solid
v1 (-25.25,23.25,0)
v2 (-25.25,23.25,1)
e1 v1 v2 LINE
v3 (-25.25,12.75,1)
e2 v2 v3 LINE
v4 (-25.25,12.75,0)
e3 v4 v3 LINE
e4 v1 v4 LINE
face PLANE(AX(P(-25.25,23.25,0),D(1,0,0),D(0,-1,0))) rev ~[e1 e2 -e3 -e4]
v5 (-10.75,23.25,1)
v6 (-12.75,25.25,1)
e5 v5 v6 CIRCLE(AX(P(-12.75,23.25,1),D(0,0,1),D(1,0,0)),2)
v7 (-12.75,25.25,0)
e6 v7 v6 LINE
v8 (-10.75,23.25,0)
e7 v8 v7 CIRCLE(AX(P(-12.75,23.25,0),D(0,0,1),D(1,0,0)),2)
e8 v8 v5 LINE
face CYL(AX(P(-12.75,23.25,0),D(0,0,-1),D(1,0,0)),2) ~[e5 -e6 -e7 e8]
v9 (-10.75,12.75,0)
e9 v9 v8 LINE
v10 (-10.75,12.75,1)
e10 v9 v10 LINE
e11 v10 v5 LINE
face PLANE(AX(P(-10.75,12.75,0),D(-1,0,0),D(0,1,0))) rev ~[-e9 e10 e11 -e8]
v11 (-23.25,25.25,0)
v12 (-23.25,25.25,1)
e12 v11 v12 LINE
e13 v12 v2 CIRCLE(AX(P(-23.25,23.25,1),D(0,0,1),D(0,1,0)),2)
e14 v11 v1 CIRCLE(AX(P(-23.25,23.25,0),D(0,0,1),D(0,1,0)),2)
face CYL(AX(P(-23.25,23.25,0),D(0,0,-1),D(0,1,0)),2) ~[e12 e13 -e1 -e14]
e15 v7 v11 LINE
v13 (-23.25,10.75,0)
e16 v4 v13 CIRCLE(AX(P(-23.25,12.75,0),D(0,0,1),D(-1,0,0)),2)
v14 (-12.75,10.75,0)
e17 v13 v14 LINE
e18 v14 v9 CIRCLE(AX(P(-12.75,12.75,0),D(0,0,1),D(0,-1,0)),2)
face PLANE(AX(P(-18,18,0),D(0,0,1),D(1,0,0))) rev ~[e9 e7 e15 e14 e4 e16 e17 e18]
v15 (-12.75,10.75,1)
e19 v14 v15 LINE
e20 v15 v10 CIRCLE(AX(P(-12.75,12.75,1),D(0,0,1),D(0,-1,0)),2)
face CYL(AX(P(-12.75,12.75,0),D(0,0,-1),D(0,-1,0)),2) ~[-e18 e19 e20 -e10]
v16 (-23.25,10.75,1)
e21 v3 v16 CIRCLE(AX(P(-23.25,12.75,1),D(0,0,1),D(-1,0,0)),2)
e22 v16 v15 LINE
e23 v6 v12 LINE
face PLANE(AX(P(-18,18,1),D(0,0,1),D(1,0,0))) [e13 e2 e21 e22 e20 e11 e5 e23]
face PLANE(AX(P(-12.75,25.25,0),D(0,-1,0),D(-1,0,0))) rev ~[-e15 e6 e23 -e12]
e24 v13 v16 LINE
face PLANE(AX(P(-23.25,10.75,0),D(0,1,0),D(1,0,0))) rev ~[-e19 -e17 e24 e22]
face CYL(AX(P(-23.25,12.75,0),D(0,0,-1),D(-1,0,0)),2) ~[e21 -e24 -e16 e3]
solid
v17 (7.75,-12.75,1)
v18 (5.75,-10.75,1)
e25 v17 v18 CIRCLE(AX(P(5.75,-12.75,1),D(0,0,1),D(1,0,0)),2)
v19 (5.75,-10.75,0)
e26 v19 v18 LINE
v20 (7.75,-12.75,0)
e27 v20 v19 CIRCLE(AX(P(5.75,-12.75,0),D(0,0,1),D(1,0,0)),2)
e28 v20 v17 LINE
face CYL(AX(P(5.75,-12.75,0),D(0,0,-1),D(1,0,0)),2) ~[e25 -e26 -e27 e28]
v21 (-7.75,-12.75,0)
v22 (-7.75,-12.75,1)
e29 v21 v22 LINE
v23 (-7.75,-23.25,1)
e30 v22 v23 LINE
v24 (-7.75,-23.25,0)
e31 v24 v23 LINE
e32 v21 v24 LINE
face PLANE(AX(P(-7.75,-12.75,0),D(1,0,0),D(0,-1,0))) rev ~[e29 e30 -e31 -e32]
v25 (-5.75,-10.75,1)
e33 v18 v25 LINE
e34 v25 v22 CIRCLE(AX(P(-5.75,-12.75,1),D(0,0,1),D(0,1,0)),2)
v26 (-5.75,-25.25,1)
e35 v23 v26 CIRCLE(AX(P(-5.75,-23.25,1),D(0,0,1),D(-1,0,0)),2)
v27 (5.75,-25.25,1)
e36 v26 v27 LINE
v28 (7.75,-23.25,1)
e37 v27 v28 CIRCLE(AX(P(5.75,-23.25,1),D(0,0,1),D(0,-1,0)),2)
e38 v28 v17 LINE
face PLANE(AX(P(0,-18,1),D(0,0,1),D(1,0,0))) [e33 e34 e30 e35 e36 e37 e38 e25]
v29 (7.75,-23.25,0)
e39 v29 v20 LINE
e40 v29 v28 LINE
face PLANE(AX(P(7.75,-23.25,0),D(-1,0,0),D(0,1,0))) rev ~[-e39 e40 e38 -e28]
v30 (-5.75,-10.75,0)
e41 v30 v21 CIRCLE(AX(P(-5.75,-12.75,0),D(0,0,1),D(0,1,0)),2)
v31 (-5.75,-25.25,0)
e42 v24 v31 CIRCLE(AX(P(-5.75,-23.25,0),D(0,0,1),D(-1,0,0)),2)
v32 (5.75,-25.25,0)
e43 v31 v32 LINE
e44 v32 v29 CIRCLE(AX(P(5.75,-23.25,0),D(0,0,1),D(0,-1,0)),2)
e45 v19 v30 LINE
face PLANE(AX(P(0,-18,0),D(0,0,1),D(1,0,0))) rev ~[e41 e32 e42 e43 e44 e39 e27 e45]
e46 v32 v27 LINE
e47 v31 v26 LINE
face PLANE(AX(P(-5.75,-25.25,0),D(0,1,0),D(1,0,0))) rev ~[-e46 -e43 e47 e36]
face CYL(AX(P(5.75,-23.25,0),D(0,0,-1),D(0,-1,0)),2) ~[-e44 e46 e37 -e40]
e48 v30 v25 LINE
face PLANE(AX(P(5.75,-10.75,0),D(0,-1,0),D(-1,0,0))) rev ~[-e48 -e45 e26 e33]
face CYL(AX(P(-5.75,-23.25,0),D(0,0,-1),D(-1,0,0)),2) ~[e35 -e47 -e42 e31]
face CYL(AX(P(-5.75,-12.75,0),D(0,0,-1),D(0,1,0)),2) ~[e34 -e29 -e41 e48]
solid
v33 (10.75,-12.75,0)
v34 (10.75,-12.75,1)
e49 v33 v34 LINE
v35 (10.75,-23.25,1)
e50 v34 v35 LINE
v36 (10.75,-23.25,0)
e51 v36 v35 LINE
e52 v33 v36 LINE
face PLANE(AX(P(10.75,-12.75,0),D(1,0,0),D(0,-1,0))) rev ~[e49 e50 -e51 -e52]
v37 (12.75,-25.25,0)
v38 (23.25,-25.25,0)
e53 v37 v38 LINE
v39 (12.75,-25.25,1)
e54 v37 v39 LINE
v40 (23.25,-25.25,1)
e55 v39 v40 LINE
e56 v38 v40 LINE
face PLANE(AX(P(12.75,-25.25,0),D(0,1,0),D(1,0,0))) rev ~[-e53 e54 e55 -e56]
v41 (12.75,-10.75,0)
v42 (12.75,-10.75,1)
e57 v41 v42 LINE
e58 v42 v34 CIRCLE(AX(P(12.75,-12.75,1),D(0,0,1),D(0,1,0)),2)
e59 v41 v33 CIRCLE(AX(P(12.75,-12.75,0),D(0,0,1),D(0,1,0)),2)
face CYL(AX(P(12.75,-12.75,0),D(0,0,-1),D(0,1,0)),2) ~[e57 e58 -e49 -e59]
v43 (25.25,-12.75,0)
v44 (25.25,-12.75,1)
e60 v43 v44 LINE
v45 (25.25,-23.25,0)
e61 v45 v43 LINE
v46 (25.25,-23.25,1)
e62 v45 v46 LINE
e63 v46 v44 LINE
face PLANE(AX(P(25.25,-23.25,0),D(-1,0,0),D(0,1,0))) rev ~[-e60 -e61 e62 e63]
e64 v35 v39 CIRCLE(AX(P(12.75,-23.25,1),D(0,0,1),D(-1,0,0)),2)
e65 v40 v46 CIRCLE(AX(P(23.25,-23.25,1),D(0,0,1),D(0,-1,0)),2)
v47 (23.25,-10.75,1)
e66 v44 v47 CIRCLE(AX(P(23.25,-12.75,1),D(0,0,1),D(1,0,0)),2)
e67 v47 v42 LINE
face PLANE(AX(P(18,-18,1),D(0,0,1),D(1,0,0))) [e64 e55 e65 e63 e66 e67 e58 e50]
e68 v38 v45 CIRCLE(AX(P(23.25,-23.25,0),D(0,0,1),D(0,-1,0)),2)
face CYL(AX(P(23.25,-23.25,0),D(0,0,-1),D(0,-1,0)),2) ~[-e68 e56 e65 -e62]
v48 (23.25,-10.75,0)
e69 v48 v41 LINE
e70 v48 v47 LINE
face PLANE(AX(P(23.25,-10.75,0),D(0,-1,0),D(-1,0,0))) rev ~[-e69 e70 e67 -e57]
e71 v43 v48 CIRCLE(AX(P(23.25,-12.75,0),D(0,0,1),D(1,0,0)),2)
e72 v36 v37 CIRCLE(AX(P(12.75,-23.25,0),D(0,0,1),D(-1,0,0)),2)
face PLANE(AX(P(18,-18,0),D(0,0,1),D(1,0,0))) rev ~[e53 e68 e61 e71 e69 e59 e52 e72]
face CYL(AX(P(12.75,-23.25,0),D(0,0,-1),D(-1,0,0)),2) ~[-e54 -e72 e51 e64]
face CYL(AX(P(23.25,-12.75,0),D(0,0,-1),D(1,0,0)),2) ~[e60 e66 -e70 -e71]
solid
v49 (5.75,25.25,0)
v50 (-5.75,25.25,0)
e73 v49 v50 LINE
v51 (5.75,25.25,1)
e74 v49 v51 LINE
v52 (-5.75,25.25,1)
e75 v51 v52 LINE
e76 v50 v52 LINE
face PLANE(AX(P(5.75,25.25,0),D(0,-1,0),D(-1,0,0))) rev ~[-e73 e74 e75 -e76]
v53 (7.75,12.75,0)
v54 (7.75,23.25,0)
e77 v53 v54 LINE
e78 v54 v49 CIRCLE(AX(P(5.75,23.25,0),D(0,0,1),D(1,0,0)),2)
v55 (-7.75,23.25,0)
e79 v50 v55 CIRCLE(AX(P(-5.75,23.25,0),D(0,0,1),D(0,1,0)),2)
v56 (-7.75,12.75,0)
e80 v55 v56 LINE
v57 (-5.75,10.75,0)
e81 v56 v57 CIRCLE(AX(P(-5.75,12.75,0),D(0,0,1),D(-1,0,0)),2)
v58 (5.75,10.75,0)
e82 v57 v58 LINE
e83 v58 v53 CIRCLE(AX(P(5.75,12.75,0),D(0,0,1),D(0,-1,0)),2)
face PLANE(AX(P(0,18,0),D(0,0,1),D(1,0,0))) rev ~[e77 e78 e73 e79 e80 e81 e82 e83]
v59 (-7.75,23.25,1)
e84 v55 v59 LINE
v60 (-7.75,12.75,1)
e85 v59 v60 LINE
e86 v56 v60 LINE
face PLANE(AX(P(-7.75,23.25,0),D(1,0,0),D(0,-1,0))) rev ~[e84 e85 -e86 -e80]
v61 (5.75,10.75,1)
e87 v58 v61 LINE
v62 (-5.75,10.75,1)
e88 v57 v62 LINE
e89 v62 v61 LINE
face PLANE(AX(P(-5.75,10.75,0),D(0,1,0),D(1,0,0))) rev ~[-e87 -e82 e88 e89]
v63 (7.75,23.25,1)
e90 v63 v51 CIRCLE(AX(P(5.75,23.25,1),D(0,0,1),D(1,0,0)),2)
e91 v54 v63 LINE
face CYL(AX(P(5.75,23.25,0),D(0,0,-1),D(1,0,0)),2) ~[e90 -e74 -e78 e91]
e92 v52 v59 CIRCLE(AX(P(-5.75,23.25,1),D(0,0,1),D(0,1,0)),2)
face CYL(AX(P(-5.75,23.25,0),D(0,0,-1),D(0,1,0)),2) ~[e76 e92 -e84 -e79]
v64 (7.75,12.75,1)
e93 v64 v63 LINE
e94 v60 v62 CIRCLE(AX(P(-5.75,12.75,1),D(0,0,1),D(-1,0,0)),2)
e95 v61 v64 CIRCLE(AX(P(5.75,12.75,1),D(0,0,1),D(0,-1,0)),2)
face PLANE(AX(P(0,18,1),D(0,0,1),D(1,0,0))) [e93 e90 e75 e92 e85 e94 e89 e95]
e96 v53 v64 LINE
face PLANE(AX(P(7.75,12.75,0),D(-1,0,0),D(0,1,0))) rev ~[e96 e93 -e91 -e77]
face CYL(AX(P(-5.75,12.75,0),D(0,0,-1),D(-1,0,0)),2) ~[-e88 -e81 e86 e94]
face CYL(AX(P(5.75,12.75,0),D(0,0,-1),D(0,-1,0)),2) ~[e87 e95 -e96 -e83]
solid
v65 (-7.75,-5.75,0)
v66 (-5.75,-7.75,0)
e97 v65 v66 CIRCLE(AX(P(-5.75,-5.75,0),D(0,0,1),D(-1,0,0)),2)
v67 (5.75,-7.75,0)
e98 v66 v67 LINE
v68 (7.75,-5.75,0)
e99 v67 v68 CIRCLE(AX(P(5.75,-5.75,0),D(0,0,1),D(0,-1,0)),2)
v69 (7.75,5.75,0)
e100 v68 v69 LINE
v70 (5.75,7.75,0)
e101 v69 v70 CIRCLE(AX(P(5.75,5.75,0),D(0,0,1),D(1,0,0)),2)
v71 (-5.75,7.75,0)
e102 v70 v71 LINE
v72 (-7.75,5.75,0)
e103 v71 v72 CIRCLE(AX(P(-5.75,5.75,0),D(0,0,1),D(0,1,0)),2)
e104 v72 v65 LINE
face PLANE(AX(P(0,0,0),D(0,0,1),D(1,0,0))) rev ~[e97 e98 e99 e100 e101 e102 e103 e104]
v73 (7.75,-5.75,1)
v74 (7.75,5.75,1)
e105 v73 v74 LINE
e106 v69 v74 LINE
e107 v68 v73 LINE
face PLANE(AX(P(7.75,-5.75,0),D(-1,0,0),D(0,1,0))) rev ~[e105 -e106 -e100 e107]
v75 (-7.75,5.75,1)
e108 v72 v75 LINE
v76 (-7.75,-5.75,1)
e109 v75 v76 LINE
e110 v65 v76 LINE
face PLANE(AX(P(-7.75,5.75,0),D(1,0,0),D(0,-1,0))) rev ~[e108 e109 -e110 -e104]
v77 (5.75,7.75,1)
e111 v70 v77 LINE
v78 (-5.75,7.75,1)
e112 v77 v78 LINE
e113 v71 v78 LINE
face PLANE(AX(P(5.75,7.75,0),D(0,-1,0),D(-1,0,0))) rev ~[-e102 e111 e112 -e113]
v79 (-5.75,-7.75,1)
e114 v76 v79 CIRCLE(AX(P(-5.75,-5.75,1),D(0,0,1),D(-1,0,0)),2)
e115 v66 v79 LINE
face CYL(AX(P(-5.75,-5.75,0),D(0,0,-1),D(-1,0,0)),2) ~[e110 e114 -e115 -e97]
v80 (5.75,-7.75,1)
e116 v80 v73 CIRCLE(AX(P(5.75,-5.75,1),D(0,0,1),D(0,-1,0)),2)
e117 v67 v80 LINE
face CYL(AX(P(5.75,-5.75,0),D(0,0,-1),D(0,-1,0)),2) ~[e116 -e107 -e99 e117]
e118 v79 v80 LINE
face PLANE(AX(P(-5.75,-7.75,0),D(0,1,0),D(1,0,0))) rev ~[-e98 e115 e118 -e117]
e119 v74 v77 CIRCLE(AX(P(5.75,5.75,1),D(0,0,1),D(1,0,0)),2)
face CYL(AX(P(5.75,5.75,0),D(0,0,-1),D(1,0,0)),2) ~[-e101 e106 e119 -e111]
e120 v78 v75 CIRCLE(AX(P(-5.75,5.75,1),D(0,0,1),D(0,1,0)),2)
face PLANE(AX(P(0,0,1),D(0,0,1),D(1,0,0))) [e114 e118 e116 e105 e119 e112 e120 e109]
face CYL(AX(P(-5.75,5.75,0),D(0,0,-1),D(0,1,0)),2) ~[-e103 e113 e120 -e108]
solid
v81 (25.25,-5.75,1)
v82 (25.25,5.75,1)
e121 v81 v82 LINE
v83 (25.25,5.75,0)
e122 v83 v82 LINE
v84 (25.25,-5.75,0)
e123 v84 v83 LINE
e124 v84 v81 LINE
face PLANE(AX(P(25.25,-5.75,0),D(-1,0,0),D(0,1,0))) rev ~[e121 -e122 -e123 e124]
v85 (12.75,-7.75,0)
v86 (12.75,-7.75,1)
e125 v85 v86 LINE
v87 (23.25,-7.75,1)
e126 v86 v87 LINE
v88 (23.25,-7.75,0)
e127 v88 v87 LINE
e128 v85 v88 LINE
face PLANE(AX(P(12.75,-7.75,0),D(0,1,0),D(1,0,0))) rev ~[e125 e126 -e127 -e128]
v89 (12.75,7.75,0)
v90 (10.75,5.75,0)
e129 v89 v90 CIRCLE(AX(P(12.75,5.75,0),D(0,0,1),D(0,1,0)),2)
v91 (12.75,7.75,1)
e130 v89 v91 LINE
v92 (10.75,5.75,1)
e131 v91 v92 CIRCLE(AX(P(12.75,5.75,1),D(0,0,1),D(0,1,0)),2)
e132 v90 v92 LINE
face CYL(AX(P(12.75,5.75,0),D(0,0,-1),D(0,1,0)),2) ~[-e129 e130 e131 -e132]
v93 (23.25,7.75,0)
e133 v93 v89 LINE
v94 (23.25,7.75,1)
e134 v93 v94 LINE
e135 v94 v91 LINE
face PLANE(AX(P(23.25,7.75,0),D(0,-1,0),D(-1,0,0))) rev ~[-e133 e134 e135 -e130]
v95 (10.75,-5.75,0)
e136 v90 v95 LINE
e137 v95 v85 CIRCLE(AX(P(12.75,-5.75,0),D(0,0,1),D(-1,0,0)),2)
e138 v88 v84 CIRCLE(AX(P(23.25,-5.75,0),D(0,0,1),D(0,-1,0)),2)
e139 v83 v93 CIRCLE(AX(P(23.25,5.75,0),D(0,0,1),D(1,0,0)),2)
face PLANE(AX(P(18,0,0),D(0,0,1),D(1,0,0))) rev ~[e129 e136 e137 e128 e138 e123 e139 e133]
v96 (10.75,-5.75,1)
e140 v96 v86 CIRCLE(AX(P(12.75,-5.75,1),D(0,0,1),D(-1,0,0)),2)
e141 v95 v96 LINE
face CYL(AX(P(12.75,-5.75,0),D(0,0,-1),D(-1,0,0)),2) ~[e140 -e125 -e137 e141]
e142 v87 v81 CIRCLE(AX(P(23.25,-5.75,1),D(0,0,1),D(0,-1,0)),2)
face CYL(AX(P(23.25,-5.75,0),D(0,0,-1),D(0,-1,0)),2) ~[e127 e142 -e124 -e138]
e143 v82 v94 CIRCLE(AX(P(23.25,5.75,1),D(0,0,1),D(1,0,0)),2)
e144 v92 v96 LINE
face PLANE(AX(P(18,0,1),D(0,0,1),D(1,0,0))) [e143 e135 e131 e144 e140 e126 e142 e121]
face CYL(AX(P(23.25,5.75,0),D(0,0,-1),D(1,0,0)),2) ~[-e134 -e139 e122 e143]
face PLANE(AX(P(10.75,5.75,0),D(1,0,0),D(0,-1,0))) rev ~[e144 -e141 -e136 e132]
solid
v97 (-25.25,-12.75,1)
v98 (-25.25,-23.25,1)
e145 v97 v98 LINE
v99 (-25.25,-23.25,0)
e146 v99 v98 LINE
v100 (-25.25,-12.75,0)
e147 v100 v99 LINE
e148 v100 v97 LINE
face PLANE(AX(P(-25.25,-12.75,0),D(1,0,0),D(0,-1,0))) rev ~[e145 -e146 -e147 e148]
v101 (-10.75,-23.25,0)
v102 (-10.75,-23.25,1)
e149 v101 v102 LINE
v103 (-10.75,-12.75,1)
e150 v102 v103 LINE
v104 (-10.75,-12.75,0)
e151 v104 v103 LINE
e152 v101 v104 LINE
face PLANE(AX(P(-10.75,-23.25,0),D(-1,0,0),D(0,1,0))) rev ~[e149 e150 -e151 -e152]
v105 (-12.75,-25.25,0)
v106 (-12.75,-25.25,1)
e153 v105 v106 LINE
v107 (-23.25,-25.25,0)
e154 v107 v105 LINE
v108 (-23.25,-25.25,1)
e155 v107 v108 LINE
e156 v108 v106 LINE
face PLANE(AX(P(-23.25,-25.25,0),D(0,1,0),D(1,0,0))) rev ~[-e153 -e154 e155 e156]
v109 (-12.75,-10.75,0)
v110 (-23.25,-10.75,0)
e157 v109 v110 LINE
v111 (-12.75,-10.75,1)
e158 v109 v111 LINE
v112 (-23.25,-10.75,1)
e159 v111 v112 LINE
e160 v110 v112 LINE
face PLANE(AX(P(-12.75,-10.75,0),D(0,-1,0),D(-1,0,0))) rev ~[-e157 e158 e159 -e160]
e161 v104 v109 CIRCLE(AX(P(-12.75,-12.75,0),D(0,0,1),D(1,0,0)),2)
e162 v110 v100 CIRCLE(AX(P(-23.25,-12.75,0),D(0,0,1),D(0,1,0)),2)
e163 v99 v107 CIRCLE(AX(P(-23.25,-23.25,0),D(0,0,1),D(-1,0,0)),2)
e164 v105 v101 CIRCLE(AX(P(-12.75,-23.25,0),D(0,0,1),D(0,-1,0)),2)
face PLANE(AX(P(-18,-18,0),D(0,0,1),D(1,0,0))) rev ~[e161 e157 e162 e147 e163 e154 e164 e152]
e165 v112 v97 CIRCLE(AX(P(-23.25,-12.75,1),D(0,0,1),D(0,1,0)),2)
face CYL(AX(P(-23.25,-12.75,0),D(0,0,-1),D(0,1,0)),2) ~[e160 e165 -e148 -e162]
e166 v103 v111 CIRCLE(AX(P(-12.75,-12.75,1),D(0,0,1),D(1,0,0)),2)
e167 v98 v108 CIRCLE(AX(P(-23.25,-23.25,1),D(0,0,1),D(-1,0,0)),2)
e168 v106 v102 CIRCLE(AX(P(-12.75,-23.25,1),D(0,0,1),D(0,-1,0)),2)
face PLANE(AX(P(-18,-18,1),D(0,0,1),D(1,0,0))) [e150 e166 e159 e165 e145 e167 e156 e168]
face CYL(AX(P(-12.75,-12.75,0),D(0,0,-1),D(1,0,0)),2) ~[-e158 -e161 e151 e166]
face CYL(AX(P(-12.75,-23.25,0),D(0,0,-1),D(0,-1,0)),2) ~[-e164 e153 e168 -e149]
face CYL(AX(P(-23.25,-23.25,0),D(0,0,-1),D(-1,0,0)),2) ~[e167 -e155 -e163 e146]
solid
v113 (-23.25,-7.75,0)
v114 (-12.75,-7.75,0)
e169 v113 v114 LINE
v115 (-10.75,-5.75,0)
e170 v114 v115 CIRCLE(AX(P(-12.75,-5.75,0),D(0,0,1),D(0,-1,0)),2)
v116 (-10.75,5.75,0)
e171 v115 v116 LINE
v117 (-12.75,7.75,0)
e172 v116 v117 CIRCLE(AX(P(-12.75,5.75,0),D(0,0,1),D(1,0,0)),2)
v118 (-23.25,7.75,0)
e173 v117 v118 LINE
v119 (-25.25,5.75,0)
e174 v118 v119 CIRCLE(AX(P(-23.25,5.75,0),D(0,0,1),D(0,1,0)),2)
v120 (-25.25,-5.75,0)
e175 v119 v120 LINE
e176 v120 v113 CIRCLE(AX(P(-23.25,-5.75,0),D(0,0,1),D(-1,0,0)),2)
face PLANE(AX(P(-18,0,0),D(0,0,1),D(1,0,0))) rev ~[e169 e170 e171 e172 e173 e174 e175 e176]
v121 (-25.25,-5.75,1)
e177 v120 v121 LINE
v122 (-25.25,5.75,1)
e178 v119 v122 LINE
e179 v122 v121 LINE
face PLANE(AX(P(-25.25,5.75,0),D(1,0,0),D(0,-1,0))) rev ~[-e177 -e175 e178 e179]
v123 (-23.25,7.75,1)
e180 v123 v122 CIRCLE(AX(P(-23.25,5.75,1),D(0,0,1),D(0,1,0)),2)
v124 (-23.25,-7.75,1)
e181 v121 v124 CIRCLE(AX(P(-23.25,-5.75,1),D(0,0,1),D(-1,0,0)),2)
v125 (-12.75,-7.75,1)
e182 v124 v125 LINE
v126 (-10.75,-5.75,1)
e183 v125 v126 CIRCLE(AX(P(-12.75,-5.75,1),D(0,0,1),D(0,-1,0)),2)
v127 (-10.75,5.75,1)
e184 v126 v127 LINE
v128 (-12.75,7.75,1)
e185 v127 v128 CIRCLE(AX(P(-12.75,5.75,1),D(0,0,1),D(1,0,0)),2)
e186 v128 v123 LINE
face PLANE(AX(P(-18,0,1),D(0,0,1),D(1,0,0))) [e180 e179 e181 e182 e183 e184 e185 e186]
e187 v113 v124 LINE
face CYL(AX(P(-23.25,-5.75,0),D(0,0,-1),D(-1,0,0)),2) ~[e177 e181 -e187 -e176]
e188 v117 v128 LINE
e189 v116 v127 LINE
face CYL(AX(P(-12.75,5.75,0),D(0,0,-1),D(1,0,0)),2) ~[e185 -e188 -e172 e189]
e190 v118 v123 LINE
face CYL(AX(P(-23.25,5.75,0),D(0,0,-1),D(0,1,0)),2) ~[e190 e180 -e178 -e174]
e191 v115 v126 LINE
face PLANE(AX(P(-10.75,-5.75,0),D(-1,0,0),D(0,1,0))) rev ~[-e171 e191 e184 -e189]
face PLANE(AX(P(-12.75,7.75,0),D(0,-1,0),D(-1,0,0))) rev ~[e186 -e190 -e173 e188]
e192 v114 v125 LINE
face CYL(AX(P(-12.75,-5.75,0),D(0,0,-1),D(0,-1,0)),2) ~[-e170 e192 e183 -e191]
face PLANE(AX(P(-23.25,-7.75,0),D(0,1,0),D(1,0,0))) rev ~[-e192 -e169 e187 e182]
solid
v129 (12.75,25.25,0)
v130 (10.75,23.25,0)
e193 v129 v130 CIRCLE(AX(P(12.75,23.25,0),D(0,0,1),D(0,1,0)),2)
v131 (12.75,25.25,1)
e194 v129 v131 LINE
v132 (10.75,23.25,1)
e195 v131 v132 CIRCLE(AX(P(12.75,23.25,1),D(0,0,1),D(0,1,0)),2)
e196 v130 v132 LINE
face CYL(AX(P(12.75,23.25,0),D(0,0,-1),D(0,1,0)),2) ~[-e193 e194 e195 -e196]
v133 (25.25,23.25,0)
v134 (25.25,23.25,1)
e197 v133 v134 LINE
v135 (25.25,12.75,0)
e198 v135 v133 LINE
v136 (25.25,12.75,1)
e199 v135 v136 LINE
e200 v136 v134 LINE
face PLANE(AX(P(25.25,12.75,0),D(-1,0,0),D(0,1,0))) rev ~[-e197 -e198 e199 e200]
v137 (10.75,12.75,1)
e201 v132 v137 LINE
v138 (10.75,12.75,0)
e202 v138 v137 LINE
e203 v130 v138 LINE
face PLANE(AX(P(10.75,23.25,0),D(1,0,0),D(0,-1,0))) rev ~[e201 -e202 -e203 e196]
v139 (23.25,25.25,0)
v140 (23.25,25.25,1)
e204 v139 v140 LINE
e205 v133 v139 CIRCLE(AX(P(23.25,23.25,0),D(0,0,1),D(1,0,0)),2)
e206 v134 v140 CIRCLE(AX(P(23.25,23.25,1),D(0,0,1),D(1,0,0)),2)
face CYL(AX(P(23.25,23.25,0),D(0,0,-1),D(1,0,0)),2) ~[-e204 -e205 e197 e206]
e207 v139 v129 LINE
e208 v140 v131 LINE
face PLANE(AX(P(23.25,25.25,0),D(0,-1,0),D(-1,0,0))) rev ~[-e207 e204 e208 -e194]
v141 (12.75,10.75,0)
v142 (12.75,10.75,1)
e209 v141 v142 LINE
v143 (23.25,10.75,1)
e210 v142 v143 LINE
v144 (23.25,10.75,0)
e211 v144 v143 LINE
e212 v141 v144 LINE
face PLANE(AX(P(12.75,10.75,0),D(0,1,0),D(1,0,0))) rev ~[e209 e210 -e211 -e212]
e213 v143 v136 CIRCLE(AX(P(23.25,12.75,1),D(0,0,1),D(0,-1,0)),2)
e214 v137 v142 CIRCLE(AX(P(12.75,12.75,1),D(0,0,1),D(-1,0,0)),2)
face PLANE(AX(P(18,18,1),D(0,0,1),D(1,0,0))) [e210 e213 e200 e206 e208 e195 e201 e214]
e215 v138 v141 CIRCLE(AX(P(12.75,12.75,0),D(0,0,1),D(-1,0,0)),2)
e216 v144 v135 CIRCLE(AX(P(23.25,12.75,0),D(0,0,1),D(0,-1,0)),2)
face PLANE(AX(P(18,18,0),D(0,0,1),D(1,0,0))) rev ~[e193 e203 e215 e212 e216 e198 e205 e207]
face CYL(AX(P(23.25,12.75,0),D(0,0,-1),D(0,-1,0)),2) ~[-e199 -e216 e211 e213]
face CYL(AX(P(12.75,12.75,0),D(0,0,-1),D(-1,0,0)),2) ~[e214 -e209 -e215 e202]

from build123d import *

# Parameters (mm, degrees)
F1_DEPTH = 1


with BuildPart() as f1:
    # F0 (on Top) → F1 (new body)
    with BuildSketch(Plane.XY):
        with BuildLine():
            Line((-12.75, -10.75), (-23.25, -10.75))
            ThreePointArc((-23.25, -10.75), (-24.6642135624, -11.3357864376), (-25.25, -12.75))
            Line((-25.25, -12.75), (-25.25, -23.25))
            ThreePointArc((-25.25, -23.25), (-24.6642135624, -24.6642135624), (-23.25, -25.25))
            Line((-23.25, -25.25), (-12.75, -25.25))
            ThreePointArc((-12.75, -25.25), (-11.3357864376, -24.6642135624), (-10.75, -23.25))
            Line((-10.75, -23.25), (-10.75, -12.75))
            ThreePointArc((-10.75, -12.75), (-11.3357864376, -11.3357864376), (-12.75, -10.75))
        make_face()
    extrude(amount=F1_DEPTH)


with BuildPart() as f1b:
    # F0 (on Top) → F1, piece 2 (new body)
    with BuildSketch(Plane.XY):
        with BuildLine():
            Line((5.75, -10.75), (-5.75, -10.75))
            ThreePointArc((-5.75, -10.75), (-7.1642135624, -11.3357864376), (-7.75, -12.75))
            Line((-7.75, -12.75), (-7.75, -23.25))
            ThreePointArc((-7.75, -23.25), (-7.1642135624, -24.6642135624), (-5.75, -25.25))
            Line((-5.75, -25.25), (5.75, -25.25))
            ThreePointArc((5.75, -25.25), (7.1642135624, -24.6642135624), (7.75, -23.25))
            Line((7.75, -23.25), (7.75, -12.75))
            ThreePointArc((7.75, -12.75), (7.1642135624, -11.3357864376), (5.75, -10.75))
        make_face()
    extrude(amount=F1_DEPTH)


with BuildPart() as f1c:
    # F0 (on Top) → F1, piece 3 (new body)
    with BuildSketch(Plane.XY):
        with BuildLine():
            ThreePointArc((7.75, 5.75), (7.1642135624, 7.1642135624), (5.75, 7.75))
            Line((5.75, 7.75), (-5.75, 7.75))
            ThreePointArc((-5.75, 7.75), (-7.1642135624, 7.1642135624), (-7.75, 5.75))
            Line((-7.75, 5.75), (-7.75, -5.75))
            ThreePointArc((-7.75, -5.75), (-7.1642135624, -7.1642135624), (-5.75, -7.75))
            Line((-5.75, -7.75), (5.75, -7.75))
            ThreePointArc((5.75, -7.75), (7.1642135624, -7.1642135624), (7.75, -5.75))
            Line((7.75, -5.75), (7.75, 5.75))
        make_face()
    extrude(amount=F1_DEPTH)


with BuildPart() as f1d:
    # F0 (on Top) → F1, piece 4 (new body)
    with BuildSketch(Plane.XY):
        with BuildLine():
            Line((10.75, 5.75), (10.75, -5.75))
            ThreePointArc((10.75, -5.75), (11.3357864376, -7.1642135624), (12.75, -7.75))
            Line((12.75, -7.75), (23.25, -7.75))
            ThreePointArc((23.25, -7.75), (24.6642135624, -7.1642135624), (25.25, -5.75))
            Line((25.25, -5.75), (25.25, 5.75))
            ThreePointArc((25.25, 5.75), (24.6642135624, 7.1642135624), (23.25, 7.75))
            Line((23.25, 7.75), (12.75, 7.75))
            ThreePointArc((12.75, 7.75), (11.3357864376, 7.1642135624), (10.75, 5.75))
        make_face()
    extrude(amount=F1_DEPTH)


with BuildPart() as f1e:
    # F0 (on Top) → F1, piece 5 (new body)
    with BuildSketch(Plane.XY):
        with BuildLine():
            ThreePointArc((10.75, -23.25), (11.3357864376, -24.6642135624), (12.75, -25.25))
            Line((12.75, -25.25), (23.25, -25.25))
            ThreePointArc((23.25, -25.25), (24.6642135624, -24.6642135624), (25.25, -23.25))
            Line((25.25, -23.25), (25.25, -12.75))
            ThreePointArc((25.25, -12.75), (24.6642135624, -11.3357864376), (23.25, -10.75))
            Line((23.25, -10.75), (12.75, -10.75))
            ThreePointArc((12.75, -10.75), (11.3357864376, -11.3357864376), (10.75, -12.75))
            Line((10.75, -12.75), (10.75, -23.25))
        make_face()
    extrude(amount=F1_DEPTH)


with BuildPart() as f1f:
    # F0 (on Top) → F1, piece 6 (new body)
    with BuildSketch(Plane.XY):
        with BuildLine():
            Line((-5.75, 10.75), (5.75, 10.75))
            ThreePointArc((5.75, 10.75), (7.1642135624, 11.3357864376), (7.75, 12.75))
            Line((7.75, 12.75), (7.75, 23.25))
            ThreePointArc((7.75, 23.25), (7.1642135624, 24.6642135624), (5.75, 25.25))
            Line((5.75, 25.25), (-5.75, 25.25))
            ThreePointArc((-5.75, 25.25), (-7.1642135624, 24.6642135624), (-7.75, 23.25))
            Line((-7.75, 23.25), (-7.75, 12.75))
            ThreePointArc((-7.75, 12.75), (-7.1642135624, 11.3357864376), (-5.75, 10.75))
        make_face()
    extrude(amount=F1_DEPTH)


with BuildPart() as f1g:
    # F0 (on Top) → F1, piece 7 (new body)
    with BuildSketch(Plane.XY):
        with BuildLine():
            ThreePointArc((23.25, 10.75), (24.6642135624, 11.3357864376), (25.25, 12.75))
            Line((25.25, 12.75), (25.25, 23.25))
            ThreePointArc((25.25, 23.25), (24.6642135624, 24.6642135624), (23.25, 25.25))
            Line((23.25, 25.25), (12.75, 25.25))
            ThreePointArc((12.75, 25.25), (11.3357864376, 24.6642135624), (10.75, 23.25))
            Line((10.75, 23.25), (10.75, 12.75))
            ThreePointArc((10.75, 12.75), (11.3357864376, 11.3357864376), (12.75, 10.75))
            Line((12.75, 10.75), (23.25, 10.75))
        make_face()
    extrude(amount=F1_DEPTH)


with BuildPart() as f1h:
    # F0 (on Top) → F1, piece 8 (new body)
    with BuildSketch(Plane.XY):
        with BuildLine():
            Line((-10.75, -5.75), (-10.75, 5.75))
            ThreePointArc((-10.75, 5.75), (-11.3357864376, 7.1642135624), (-12.75, 7.75))
            Line((-12.75, 7.75), (-23.25, 7.75))
            ThreePointArc((-23.25, 7.75), (-24.6642135624, 7.1642135624), (-25.25, 5.75))
            Line((-25.25, 5.75), (-25.25, -5.75))
            ThreePointArc((-25.25, -5.75), (-24.6642135624, -7.1642135624), (-23.25, -7.75))
            Line((-23.25, -7.75), (-12.75, -7.75))
            ThreePointArc((-12.75, -7.75), (-11.3357864376, -7.1642135624), (-10.75, -5.75))
        make_face()
    extrude(amount=F1_DEPTH)


with BuildPart() as f1i:
    # F0 (on Top) → F1, piece 9 (new body)
    with BuildSketch(Plane.XY):
        with BuildLine():
            ThreePointArc((-10.75, 23.25), (-11.3357864376, 24.6642135624), (-12.75, 25.25))
            Line((-12.75, 25.25), (-23.25, 25.25))
            ThreePointArc((-23.25, 25.25), (-24.6642135624, 24.6642135624), (-25.25, 23.25))
            Line((-25.25, 23.25), (-25.25, 12.75))
            ThreePointArc((-25.25, 12.75), (-24.6642135624, 11.3357864376), (-23.25, 10.75))
            Line((-23.25, 10.75), (-12.75, 10.75))
            ThreePointArc((-12.75, 10.75), (-11.3357864376, 11.3357864376), (-10.75, 12.75))
            Line((-10.75, 12.75), (-10.75, 23.25))
        make_face()
    extrude(amount=F1_DEPTH)


solid = Compound([f1.part, f1b.part, f1c.part, f1d.part, f1e.part, f1f.part, f1g.part, f1h.part, f1i.part])
